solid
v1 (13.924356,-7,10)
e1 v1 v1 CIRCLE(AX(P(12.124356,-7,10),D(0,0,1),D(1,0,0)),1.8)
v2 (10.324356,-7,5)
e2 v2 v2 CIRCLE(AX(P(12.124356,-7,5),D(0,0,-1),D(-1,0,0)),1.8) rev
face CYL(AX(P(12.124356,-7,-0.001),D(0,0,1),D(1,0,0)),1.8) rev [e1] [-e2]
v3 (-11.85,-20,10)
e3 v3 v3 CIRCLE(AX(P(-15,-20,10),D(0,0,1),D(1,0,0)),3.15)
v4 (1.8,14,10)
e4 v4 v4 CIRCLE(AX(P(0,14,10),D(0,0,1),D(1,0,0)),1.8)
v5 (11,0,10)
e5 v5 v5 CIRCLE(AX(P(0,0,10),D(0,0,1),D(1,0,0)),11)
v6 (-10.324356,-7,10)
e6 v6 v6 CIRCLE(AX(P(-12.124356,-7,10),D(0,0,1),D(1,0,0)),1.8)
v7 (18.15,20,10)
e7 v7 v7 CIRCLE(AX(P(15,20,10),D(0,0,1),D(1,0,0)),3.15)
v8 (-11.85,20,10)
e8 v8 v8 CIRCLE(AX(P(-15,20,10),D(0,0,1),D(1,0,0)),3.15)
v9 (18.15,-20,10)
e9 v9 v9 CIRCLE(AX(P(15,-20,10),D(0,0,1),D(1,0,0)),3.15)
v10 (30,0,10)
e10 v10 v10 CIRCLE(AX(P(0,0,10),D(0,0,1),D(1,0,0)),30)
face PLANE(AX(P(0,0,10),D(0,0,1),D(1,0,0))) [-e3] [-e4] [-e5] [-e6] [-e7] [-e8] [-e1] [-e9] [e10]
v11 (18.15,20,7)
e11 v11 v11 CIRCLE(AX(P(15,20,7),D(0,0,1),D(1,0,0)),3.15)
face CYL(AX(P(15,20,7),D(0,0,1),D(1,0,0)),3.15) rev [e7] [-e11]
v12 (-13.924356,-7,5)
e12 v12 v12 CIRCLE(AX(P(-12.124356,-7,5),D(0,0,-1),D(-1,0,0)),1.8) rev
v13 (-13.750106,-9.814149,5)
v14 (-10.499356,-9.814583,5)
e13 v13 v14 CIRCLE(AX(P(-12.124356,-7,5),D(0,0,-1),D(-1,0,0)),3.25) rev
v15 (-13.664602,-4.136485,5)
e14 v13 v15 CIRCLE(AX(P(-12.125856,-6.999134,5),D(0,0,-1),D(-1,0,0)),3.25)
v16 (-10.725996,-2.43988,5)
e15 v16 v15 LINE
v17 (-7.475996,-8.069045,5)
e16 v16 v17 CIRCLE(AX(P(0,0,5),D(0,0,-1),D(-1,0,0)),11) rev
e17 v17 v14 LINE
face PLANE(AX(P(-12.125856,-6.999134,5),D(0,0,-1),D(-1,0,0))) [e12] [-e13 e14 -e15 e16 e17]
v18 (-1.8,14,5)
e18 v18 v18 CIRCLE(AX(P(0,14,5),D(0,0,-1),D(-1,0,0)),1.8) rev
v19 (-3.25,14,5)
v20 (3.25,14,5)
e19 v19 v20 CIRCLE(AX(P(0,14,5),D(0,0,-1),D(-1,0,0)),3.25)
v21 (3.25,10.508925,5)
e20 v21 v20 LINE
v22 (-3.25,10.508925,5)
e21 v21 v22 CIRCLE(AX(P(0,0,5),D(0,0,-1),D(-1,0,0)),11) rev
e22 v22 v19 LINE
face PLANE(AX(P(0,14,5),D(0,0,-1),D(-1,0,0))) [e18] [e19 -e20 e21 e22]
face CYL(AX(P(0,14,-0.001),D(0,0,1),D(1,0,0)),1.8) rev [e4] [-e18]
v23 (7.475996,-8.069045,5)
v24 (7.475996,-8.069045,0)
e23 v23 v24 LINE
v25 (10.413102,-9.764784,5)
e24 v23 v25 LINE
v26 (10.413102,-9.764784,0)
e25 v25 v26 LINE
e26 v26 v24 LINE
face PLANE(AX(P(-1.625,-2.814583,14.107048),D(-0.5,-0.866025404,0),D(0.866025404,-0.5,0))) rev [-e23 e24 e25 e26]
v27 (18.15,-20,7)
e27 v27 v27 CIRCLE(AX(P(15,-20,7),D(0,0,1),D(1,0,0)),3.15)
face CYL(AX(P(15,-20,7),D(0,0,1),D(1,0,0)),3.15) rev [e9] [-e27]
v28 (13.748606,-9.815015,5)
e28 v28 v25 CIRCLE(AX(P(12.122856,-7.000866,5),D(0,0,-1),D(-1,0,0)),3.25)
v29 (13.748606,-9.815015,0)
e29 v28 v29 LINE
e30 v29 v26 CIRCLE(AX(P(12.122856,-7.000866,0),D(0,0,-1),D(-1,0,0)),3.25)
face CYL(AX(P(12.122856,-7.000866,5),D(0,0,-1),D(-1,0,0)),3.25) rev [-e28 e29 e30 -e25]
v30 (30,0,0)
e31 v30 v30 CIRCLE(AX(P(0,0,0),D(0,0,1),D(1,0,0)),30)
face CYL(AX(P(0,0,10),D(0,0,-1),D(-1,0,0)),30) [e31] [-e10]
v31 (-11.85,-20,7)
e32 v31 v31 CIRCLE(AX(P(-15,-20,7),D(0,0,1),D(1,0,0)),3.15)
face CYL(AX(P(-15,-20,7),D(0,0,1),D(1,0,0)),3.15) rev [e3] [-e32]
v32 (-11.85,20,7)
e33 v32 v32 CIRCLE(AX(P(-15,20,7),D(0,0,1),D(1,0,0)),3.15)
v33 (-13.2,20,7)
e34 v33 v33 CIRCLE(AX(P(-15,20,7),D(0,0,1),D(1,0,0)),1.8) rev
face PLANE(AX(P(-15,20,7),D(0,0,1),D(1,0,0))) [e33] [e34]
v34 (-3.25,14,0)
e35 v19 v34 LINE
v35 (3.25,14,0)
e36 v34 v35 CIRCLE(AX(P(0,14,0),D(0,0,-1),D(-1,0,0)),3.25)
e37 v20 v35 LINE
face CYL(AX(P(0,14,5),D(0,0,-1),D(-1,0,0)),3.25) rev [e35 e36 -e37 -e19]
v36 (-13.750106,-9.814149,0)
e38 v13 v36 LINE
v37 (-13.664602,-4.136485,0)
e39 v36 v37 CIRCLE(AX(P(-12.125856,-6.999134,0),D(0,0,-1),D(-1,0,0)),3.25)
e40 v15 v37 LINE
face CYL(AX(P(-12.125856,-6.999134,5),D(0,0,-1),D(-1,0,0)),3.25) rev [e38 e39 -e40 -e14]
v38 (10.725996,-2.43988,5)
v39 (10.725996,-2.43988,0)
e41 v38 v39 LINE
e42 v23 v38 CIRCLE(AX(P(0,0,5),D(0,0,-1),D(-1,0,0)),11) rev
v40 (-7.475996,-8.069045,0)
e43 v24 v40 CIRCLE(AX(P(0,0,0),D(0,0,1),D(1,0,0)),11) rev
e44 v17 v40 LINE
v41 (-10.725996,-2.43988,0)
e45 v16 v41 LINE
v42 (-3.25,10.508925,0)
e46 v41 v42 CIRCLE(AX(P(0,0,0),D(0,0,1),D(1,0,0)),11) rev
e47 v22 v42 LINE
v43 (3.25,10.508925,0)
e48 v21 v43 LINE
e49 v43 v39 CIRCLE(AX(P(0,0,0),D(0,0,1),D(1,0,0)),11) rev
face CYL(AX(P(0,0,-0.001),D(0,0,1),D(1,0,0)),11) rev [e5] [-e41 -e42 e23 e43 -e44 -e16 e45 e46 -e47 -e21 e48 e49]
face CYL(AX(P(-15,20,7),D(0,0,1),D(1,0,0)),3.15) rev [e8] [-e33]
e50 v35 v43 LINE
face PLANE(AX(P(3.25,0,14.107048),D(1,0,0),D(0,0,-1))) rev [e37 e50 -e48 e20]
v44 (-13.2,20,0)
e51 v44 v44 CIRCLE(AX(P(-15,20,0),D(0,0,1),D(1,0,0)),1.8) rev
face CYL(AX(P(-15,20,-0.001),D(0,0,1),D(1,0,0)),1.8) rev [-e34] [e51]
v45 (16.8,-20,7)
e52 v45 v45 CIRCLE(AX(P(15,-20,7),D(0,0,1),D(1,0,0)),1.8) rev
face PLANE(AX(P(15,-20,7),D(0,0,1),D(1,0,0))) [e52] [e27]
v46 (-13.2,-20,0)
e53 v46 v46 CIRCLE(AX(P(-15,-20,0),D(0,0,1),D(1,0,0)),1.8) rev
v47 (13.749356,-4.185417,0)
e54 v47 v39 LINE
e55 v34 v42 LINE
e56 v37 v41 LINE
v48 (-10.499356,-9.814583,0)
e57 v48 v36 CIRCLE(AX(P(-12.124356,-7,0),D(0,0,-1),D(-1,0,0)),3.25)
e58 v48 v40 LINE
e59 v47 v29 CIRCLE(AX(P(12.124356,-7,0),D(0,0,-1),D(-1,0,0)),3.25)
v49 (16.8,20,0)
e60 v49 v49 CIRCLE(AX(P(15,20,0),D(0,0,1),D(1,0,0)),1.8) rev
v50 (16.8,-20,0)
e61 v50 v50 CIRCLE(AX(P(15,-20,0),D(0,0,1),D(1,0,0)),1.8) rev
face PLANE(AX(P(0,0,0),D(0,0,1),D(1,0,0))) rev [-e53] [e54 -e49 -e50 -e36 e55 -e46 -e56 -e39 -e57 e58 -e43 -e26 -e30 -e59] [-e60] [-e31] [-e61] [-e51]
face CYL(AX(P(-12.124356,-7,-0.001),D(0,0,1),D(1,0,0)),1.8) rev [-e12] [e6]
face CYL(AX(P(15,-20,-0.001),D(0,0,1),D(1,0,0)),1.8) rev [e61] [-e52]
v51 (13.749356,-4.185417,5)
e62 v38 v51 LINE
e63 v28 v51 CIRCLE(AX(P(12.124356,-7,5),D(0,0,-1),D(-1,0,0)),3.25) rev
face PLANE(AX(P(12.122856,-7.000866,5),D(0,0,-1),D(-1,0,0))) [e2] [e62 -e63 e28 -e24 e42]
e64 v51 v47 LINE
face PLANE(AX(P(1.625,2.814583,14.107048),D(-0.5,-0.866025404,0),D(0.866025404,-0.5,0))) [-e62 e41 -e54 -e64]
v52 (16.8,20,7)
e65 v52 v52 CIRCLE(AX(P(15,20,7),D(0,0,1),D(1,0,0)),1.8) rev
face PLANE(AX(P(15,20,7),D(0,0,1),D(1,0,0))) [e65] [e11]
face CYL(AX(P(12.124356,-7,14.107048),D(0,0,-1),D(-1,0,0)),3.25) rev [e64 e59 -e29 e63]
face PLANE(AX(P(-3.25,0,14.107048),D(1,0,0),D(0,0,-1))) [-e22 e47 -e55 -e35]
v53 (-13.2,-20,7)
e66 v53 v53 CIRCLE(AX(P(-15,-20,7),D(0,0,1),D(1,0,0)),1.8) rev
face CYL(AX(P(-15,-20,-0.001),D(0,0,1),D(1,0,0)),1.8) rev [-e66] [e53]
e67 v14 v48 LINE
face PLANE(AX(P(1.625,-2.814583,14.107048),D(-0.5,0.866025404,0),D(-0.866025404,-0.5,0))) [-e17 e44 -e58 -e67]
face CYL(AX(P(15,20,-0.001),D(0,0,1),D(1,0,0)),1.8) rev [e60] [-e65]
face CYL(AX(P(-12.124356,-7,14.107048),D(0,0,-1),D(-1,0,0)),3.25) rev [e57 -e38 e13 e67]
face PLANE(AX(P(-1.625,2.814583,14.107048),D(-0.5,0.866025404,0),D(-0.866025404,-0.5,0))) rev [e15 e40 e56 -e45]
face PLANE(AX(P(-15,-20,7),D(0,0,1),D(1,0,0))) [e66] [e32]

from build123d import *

# Parameters (mm, degrees)
SKETCH_1_R          = 30
EXTRUDE_1_DEPTH     = 10
CUT_EXTRUDE_1_REACH = 45.589
SKETCH_2_R          = 1.8
SKETCH_3_R          = 3.25
CUT_EXTRUDE_2_DEPTH = 5
CUT_EXTRUDE_3_REACH = 45.589
SKETCH_4_R          = 1.8
SKETCH_5_R          = 3.15
CUT_EXTRUDE_4_DEPTH = 3
CUT_EXTRUDE_5_REACH = 45.589
SKETCH_6_R          = 11
CUT_EXTRUDE_START   = -5
CUT_EXTRUDE_6_DEPTH = 5


# Read off the part's stored shape, not the designer's step: 切除-拉伸6
with BuildPart() as part:
    # 草图1 → 凸台-拉伸1 (new body)
    with BuildSketch(Plane.XY):
        Circle(SKETCH_1_R)
    extrude(amount=EXTRUDE_1_DEPTH)

    # 草图2 → 切除-拉伸1 (cut, up to next)
    with BuildSketch(Plane.XY.offset(10), mode=Mode.PRIVATE) as cut_extrude_1_sk1:
        with Locations((0, 14)):
            Circle(SKETCH_2_R)
    cut_extrude_1_tool1 = extrude(cut_extrude_1_sk1.sketch, amount=-CUT_EXTRUDE_1_REACH, mode=Mode.PRIVATE) & part.part
    # 草图2 → 切除-拉伸1 (cut, up to next)
    with BuildSketch(Plane.XY.offset(10), mode=Mode.PRIVATE) as cut_extrude_1_sk2:
        with Locations((12.124355653, -7)):
            Circle(SKETCH_2_R)
    cut_extrude_1_tool2 = extrude(cut_extrude_1_sk2.sketch, amount=-CUT_EXTRUDE_1_REACH, mode=Mode.PRIVATE) & part.part
    # 草图2 → 切除-拉伸1 (cut, up to next)
    with BuildSketch(Plane.XY.offset(10), mode=Mode.PRIVATE) as cut_extrude_1_sk3:
        with Locations((-12.124355653, -7)):
            Circle(SKETCH_2_R)
    cut_extrude_1_tool3 = extrude(cut_extrude_1_sk3.sketch, amount=-CUT_EXTRUDE_1_REACH, mode=Mode.PRIVATE) & part.part
    add(cut_extrude_1_tool1.solids().sort_by_distance((0, 14, 10))[0], mode=Mode.SUBTRACT)
    add(cut_extrude_1_tool2.solids().sort_by_distance((12.124356, -7, 10))[0], mode=Mode.SUBTRACT)
    add(cut_extrude_1_tool3.solids().sort_by_distance((-12.124356, -7, 10))[0], mode=Mode.SUBTRACT)

    # 草图3 → 切除-拉伸2 (cut)
    with BuildSketch(Plane(origin=(0, 0, 0), x_dir=(-1, 0, 0), z_dir=(0, 0, -1))):
        with Locations((0, 14)):
            Circle(SKETCH_3_R)
        with Locations((12.125855653, -6.999133975)):
            Circle(SKETCH_3_R)
        with Locations((-12.122855653, -7.000866025)):
            Circle(SKETCH_3_R)
    extrude(amount=-CUT_EXTRUDE_2_DEPTH, mode=Mode.SUBTRACT)

    # 草图4 → 切除-拉伸3 (cut, up to next)
    with BuildSketch(Plane.XY.offset(10), mode=Mode.PRIVATE) as cut_extrude_3_sk1:
        with Locations((-15, -20)):
            Circle(SKETCH_4_R)
    cut_extrude_3_tool1 = extrude(cut_extrude_3_sk1.sketch, amount=-CUT_EXTRUDE_3_REACH, mode=Mode.PRIVATE) & part.part
    # 草图4 → 切除-拉伸3 (cut, up to next)
    with BuildSketch(Plane.XY.offset(10), mode=Mode.PRIVATE) as cut_extrude_3_sk2:
        with Locations((15, -20)):
            Circle(SKETCH_4_R)
    cut_extrude_3_tool2 = extrude(cut_extrude_3_sk2.sketch, amount=-CUT_EXTRUDE_3_REACH, mode=Mode.PRIVATE) & part.part
    # 草图4 → 切除-拉伸3 (cut, up to next)
    with BuildSketch(Plane.XY.offset(10), mode=Mode.PRIVATE) as cut_extrude_3_sk3:
        with Locations((15, 20)):
            Circle(SKETCH_4_R)
    cut_extrude_3_tool3 = extrude(cut_extrude_3_sk3.sketch, amount=-CUT_EXTRUDE_3_REACH, mode=Mode.PRIVATE) & part.part
    # 草图4 → 切除-拉伸3 (cut, up to next)
    with BuildSketch(Plane.XY.offset(10), mode=Mode.PRIVATE) as cut_extrude_3_sk4:
        with Locations((-15, 20)):
            Circle(SKETCH_4_R)
    cut_extrude_3_tool4 = extrude(cut_extrude_3_sk4.sketch, amount=-CUT_EXTRUDE_3_REACH, mode=Mode.PRIVATE) & part.part
    add(cut_extrude_3_tool1.solids().sort_by_distance((-15, -20, 10))[0], mode=Mode.SUBTRACT)
    add(cut_extrude_3_tool2.solids().sort_by_distance((15, -20, 10))[0], mode=Mode.SUBTRACT)
    add(cut_extrude_3_tool3.solids().sort_by_distance((15, 20, 10))[0], mode=Mode.SUBTRACT)
    add(cut_extrude_3_tool4.solids().sort_by_distance((-15, 20, 10))[0], mode=Mode.SUBTRACT)

    # 草图5 → 切除-拉伸4 (cut)
    with BuildSketch(Plane.XY.offset(10)):
        with Locations((-15, 20)):
            Circle(SKETCH_5_R)
        with Locations((15, 20)):
            Circle(SKETCH_5_R)
        with Locations((15, -20)):
            Circle(SKETCH_5_R)
        with Locations((-15, -20)):
            Circle(SKETCH_5_R)
    extrude(amount=-CUT_EXTRUDE_4_DEPTH, mode=Mode.SUBTRACT)

    # 草图6 → 切除-拉伸5 (cut, up to next)
    with BuildSketch(Plane.XY.offset(10), mode=Mode.PRIVATE) as cut_extrude_5_sk1:
        Circle(SKETCH_6_R)
    cut_extrude_5_tool1 = extrude(cut_extrude_5_sk1.sketch, amount=-CUT_EXTRUDE_5_REACH, mode=Mode.PRIVATE) & part.part
    add(cut_extrude_5_tool1.solids().sort_by_distance((0, 0, 10))[0], mode=Mode.SUBTRACT)

    # 切除-拉伸6 outline → 切除-拉伸6 (cut)
    with BuildSketch(Plane(origin=(0, 0, 0), x_dir=(-1, 0, 0), z_dir=(0, 0, -1)).offset(CUT_EXTRUDE_START)):
        with BuildLine():
            Line((-10.725995825, -2.439879827), (-13.749355653, -4.185417438))
            ThreePointArc((-13.749355653, -4.185417438), (-15.374355624, -7.000433013), (-13.748605595, -9.815015475))
            ThreePointArc((-13.748605595, -9.815015475), (-14.784005692, -5.135181039), (-10.031538938, -4.513117164))
            ThreePointArc((-10.031538938, -4.513117164), (-10.430407021, -3.493795841), (-10.725995825, -2.439879827))
        make_face()
        with BuildLine():
            Line((-3.25, 14), (-3.25, 10.508924778))
            ThreePointArc((-3.25, 10.508924778), (-2.189145313, 10.779964879), (-1.10660044, 10.944196429))
            ThreePointArc((-1.10660044, 10.944196429), (-2.660728418, 12.133713772), (-3.25, 14))
        make_face()
        with BuildLine():
            ThreePointArc((-8.92286522, -6.432921286), (-9.15608578, -8.327808571), (-10.413102364, -9.764784202))
            Line((-10.413102364, -9.764784202), (-7.475995825, -8.069044952))
            ThreePointArc((-7.475995825, -8.069044952), (-8.240138715, -7.2869825), (-8.92286522, -6.432921286))
        make_face()
        with BuildLine():
            Line((3.25, 10.508924778), (3.25, 14))
            ThreePointArc((3.25, 14), (2.660728418, 12.133713772), (1.10660044, 10.944196429))
            ThreePointArc((1.10660044, 10.944196429), (2.189145313, 10.779964879), (3.25, 10.508924778))
        make_face()
        with BuildLine():
            ThreePointArc((8.926440063, -6.427959847), (8.242163905, -7.284691768), (7.475995825, -8.069044952))
            Line((7.475995825, -8.069044952), (10.499355653, -9.814582562))
            ThreePointArc((10.499355653, -9.814582562), (12.124788665, -10.249999971), (13.750105595, -9.81414945))
            ThreePointArc((13.750105595, -9.81414945), (10.258542955, -9.659142113), (8.926440063, -6.427959847))
        make_face()
        with BuildLine():
            ThreePointArc((10.725995825, -2.439879827), (10.430184526, -3.49446001), (10.030964095, -4.514394681))
            ThreePointArc((10.030964095, -4.514394681), (11.789659007, -3.766569697), (13.664602363, -4.136485104))
            Line((13.664602363, -4.136485104), (10.725995825, -2.439879827))
        make_face()
    extrude(amount=CUT_EXTRUDE_6_DEPTH, mode=Mode.SUBTRACT)


solid = part.part
